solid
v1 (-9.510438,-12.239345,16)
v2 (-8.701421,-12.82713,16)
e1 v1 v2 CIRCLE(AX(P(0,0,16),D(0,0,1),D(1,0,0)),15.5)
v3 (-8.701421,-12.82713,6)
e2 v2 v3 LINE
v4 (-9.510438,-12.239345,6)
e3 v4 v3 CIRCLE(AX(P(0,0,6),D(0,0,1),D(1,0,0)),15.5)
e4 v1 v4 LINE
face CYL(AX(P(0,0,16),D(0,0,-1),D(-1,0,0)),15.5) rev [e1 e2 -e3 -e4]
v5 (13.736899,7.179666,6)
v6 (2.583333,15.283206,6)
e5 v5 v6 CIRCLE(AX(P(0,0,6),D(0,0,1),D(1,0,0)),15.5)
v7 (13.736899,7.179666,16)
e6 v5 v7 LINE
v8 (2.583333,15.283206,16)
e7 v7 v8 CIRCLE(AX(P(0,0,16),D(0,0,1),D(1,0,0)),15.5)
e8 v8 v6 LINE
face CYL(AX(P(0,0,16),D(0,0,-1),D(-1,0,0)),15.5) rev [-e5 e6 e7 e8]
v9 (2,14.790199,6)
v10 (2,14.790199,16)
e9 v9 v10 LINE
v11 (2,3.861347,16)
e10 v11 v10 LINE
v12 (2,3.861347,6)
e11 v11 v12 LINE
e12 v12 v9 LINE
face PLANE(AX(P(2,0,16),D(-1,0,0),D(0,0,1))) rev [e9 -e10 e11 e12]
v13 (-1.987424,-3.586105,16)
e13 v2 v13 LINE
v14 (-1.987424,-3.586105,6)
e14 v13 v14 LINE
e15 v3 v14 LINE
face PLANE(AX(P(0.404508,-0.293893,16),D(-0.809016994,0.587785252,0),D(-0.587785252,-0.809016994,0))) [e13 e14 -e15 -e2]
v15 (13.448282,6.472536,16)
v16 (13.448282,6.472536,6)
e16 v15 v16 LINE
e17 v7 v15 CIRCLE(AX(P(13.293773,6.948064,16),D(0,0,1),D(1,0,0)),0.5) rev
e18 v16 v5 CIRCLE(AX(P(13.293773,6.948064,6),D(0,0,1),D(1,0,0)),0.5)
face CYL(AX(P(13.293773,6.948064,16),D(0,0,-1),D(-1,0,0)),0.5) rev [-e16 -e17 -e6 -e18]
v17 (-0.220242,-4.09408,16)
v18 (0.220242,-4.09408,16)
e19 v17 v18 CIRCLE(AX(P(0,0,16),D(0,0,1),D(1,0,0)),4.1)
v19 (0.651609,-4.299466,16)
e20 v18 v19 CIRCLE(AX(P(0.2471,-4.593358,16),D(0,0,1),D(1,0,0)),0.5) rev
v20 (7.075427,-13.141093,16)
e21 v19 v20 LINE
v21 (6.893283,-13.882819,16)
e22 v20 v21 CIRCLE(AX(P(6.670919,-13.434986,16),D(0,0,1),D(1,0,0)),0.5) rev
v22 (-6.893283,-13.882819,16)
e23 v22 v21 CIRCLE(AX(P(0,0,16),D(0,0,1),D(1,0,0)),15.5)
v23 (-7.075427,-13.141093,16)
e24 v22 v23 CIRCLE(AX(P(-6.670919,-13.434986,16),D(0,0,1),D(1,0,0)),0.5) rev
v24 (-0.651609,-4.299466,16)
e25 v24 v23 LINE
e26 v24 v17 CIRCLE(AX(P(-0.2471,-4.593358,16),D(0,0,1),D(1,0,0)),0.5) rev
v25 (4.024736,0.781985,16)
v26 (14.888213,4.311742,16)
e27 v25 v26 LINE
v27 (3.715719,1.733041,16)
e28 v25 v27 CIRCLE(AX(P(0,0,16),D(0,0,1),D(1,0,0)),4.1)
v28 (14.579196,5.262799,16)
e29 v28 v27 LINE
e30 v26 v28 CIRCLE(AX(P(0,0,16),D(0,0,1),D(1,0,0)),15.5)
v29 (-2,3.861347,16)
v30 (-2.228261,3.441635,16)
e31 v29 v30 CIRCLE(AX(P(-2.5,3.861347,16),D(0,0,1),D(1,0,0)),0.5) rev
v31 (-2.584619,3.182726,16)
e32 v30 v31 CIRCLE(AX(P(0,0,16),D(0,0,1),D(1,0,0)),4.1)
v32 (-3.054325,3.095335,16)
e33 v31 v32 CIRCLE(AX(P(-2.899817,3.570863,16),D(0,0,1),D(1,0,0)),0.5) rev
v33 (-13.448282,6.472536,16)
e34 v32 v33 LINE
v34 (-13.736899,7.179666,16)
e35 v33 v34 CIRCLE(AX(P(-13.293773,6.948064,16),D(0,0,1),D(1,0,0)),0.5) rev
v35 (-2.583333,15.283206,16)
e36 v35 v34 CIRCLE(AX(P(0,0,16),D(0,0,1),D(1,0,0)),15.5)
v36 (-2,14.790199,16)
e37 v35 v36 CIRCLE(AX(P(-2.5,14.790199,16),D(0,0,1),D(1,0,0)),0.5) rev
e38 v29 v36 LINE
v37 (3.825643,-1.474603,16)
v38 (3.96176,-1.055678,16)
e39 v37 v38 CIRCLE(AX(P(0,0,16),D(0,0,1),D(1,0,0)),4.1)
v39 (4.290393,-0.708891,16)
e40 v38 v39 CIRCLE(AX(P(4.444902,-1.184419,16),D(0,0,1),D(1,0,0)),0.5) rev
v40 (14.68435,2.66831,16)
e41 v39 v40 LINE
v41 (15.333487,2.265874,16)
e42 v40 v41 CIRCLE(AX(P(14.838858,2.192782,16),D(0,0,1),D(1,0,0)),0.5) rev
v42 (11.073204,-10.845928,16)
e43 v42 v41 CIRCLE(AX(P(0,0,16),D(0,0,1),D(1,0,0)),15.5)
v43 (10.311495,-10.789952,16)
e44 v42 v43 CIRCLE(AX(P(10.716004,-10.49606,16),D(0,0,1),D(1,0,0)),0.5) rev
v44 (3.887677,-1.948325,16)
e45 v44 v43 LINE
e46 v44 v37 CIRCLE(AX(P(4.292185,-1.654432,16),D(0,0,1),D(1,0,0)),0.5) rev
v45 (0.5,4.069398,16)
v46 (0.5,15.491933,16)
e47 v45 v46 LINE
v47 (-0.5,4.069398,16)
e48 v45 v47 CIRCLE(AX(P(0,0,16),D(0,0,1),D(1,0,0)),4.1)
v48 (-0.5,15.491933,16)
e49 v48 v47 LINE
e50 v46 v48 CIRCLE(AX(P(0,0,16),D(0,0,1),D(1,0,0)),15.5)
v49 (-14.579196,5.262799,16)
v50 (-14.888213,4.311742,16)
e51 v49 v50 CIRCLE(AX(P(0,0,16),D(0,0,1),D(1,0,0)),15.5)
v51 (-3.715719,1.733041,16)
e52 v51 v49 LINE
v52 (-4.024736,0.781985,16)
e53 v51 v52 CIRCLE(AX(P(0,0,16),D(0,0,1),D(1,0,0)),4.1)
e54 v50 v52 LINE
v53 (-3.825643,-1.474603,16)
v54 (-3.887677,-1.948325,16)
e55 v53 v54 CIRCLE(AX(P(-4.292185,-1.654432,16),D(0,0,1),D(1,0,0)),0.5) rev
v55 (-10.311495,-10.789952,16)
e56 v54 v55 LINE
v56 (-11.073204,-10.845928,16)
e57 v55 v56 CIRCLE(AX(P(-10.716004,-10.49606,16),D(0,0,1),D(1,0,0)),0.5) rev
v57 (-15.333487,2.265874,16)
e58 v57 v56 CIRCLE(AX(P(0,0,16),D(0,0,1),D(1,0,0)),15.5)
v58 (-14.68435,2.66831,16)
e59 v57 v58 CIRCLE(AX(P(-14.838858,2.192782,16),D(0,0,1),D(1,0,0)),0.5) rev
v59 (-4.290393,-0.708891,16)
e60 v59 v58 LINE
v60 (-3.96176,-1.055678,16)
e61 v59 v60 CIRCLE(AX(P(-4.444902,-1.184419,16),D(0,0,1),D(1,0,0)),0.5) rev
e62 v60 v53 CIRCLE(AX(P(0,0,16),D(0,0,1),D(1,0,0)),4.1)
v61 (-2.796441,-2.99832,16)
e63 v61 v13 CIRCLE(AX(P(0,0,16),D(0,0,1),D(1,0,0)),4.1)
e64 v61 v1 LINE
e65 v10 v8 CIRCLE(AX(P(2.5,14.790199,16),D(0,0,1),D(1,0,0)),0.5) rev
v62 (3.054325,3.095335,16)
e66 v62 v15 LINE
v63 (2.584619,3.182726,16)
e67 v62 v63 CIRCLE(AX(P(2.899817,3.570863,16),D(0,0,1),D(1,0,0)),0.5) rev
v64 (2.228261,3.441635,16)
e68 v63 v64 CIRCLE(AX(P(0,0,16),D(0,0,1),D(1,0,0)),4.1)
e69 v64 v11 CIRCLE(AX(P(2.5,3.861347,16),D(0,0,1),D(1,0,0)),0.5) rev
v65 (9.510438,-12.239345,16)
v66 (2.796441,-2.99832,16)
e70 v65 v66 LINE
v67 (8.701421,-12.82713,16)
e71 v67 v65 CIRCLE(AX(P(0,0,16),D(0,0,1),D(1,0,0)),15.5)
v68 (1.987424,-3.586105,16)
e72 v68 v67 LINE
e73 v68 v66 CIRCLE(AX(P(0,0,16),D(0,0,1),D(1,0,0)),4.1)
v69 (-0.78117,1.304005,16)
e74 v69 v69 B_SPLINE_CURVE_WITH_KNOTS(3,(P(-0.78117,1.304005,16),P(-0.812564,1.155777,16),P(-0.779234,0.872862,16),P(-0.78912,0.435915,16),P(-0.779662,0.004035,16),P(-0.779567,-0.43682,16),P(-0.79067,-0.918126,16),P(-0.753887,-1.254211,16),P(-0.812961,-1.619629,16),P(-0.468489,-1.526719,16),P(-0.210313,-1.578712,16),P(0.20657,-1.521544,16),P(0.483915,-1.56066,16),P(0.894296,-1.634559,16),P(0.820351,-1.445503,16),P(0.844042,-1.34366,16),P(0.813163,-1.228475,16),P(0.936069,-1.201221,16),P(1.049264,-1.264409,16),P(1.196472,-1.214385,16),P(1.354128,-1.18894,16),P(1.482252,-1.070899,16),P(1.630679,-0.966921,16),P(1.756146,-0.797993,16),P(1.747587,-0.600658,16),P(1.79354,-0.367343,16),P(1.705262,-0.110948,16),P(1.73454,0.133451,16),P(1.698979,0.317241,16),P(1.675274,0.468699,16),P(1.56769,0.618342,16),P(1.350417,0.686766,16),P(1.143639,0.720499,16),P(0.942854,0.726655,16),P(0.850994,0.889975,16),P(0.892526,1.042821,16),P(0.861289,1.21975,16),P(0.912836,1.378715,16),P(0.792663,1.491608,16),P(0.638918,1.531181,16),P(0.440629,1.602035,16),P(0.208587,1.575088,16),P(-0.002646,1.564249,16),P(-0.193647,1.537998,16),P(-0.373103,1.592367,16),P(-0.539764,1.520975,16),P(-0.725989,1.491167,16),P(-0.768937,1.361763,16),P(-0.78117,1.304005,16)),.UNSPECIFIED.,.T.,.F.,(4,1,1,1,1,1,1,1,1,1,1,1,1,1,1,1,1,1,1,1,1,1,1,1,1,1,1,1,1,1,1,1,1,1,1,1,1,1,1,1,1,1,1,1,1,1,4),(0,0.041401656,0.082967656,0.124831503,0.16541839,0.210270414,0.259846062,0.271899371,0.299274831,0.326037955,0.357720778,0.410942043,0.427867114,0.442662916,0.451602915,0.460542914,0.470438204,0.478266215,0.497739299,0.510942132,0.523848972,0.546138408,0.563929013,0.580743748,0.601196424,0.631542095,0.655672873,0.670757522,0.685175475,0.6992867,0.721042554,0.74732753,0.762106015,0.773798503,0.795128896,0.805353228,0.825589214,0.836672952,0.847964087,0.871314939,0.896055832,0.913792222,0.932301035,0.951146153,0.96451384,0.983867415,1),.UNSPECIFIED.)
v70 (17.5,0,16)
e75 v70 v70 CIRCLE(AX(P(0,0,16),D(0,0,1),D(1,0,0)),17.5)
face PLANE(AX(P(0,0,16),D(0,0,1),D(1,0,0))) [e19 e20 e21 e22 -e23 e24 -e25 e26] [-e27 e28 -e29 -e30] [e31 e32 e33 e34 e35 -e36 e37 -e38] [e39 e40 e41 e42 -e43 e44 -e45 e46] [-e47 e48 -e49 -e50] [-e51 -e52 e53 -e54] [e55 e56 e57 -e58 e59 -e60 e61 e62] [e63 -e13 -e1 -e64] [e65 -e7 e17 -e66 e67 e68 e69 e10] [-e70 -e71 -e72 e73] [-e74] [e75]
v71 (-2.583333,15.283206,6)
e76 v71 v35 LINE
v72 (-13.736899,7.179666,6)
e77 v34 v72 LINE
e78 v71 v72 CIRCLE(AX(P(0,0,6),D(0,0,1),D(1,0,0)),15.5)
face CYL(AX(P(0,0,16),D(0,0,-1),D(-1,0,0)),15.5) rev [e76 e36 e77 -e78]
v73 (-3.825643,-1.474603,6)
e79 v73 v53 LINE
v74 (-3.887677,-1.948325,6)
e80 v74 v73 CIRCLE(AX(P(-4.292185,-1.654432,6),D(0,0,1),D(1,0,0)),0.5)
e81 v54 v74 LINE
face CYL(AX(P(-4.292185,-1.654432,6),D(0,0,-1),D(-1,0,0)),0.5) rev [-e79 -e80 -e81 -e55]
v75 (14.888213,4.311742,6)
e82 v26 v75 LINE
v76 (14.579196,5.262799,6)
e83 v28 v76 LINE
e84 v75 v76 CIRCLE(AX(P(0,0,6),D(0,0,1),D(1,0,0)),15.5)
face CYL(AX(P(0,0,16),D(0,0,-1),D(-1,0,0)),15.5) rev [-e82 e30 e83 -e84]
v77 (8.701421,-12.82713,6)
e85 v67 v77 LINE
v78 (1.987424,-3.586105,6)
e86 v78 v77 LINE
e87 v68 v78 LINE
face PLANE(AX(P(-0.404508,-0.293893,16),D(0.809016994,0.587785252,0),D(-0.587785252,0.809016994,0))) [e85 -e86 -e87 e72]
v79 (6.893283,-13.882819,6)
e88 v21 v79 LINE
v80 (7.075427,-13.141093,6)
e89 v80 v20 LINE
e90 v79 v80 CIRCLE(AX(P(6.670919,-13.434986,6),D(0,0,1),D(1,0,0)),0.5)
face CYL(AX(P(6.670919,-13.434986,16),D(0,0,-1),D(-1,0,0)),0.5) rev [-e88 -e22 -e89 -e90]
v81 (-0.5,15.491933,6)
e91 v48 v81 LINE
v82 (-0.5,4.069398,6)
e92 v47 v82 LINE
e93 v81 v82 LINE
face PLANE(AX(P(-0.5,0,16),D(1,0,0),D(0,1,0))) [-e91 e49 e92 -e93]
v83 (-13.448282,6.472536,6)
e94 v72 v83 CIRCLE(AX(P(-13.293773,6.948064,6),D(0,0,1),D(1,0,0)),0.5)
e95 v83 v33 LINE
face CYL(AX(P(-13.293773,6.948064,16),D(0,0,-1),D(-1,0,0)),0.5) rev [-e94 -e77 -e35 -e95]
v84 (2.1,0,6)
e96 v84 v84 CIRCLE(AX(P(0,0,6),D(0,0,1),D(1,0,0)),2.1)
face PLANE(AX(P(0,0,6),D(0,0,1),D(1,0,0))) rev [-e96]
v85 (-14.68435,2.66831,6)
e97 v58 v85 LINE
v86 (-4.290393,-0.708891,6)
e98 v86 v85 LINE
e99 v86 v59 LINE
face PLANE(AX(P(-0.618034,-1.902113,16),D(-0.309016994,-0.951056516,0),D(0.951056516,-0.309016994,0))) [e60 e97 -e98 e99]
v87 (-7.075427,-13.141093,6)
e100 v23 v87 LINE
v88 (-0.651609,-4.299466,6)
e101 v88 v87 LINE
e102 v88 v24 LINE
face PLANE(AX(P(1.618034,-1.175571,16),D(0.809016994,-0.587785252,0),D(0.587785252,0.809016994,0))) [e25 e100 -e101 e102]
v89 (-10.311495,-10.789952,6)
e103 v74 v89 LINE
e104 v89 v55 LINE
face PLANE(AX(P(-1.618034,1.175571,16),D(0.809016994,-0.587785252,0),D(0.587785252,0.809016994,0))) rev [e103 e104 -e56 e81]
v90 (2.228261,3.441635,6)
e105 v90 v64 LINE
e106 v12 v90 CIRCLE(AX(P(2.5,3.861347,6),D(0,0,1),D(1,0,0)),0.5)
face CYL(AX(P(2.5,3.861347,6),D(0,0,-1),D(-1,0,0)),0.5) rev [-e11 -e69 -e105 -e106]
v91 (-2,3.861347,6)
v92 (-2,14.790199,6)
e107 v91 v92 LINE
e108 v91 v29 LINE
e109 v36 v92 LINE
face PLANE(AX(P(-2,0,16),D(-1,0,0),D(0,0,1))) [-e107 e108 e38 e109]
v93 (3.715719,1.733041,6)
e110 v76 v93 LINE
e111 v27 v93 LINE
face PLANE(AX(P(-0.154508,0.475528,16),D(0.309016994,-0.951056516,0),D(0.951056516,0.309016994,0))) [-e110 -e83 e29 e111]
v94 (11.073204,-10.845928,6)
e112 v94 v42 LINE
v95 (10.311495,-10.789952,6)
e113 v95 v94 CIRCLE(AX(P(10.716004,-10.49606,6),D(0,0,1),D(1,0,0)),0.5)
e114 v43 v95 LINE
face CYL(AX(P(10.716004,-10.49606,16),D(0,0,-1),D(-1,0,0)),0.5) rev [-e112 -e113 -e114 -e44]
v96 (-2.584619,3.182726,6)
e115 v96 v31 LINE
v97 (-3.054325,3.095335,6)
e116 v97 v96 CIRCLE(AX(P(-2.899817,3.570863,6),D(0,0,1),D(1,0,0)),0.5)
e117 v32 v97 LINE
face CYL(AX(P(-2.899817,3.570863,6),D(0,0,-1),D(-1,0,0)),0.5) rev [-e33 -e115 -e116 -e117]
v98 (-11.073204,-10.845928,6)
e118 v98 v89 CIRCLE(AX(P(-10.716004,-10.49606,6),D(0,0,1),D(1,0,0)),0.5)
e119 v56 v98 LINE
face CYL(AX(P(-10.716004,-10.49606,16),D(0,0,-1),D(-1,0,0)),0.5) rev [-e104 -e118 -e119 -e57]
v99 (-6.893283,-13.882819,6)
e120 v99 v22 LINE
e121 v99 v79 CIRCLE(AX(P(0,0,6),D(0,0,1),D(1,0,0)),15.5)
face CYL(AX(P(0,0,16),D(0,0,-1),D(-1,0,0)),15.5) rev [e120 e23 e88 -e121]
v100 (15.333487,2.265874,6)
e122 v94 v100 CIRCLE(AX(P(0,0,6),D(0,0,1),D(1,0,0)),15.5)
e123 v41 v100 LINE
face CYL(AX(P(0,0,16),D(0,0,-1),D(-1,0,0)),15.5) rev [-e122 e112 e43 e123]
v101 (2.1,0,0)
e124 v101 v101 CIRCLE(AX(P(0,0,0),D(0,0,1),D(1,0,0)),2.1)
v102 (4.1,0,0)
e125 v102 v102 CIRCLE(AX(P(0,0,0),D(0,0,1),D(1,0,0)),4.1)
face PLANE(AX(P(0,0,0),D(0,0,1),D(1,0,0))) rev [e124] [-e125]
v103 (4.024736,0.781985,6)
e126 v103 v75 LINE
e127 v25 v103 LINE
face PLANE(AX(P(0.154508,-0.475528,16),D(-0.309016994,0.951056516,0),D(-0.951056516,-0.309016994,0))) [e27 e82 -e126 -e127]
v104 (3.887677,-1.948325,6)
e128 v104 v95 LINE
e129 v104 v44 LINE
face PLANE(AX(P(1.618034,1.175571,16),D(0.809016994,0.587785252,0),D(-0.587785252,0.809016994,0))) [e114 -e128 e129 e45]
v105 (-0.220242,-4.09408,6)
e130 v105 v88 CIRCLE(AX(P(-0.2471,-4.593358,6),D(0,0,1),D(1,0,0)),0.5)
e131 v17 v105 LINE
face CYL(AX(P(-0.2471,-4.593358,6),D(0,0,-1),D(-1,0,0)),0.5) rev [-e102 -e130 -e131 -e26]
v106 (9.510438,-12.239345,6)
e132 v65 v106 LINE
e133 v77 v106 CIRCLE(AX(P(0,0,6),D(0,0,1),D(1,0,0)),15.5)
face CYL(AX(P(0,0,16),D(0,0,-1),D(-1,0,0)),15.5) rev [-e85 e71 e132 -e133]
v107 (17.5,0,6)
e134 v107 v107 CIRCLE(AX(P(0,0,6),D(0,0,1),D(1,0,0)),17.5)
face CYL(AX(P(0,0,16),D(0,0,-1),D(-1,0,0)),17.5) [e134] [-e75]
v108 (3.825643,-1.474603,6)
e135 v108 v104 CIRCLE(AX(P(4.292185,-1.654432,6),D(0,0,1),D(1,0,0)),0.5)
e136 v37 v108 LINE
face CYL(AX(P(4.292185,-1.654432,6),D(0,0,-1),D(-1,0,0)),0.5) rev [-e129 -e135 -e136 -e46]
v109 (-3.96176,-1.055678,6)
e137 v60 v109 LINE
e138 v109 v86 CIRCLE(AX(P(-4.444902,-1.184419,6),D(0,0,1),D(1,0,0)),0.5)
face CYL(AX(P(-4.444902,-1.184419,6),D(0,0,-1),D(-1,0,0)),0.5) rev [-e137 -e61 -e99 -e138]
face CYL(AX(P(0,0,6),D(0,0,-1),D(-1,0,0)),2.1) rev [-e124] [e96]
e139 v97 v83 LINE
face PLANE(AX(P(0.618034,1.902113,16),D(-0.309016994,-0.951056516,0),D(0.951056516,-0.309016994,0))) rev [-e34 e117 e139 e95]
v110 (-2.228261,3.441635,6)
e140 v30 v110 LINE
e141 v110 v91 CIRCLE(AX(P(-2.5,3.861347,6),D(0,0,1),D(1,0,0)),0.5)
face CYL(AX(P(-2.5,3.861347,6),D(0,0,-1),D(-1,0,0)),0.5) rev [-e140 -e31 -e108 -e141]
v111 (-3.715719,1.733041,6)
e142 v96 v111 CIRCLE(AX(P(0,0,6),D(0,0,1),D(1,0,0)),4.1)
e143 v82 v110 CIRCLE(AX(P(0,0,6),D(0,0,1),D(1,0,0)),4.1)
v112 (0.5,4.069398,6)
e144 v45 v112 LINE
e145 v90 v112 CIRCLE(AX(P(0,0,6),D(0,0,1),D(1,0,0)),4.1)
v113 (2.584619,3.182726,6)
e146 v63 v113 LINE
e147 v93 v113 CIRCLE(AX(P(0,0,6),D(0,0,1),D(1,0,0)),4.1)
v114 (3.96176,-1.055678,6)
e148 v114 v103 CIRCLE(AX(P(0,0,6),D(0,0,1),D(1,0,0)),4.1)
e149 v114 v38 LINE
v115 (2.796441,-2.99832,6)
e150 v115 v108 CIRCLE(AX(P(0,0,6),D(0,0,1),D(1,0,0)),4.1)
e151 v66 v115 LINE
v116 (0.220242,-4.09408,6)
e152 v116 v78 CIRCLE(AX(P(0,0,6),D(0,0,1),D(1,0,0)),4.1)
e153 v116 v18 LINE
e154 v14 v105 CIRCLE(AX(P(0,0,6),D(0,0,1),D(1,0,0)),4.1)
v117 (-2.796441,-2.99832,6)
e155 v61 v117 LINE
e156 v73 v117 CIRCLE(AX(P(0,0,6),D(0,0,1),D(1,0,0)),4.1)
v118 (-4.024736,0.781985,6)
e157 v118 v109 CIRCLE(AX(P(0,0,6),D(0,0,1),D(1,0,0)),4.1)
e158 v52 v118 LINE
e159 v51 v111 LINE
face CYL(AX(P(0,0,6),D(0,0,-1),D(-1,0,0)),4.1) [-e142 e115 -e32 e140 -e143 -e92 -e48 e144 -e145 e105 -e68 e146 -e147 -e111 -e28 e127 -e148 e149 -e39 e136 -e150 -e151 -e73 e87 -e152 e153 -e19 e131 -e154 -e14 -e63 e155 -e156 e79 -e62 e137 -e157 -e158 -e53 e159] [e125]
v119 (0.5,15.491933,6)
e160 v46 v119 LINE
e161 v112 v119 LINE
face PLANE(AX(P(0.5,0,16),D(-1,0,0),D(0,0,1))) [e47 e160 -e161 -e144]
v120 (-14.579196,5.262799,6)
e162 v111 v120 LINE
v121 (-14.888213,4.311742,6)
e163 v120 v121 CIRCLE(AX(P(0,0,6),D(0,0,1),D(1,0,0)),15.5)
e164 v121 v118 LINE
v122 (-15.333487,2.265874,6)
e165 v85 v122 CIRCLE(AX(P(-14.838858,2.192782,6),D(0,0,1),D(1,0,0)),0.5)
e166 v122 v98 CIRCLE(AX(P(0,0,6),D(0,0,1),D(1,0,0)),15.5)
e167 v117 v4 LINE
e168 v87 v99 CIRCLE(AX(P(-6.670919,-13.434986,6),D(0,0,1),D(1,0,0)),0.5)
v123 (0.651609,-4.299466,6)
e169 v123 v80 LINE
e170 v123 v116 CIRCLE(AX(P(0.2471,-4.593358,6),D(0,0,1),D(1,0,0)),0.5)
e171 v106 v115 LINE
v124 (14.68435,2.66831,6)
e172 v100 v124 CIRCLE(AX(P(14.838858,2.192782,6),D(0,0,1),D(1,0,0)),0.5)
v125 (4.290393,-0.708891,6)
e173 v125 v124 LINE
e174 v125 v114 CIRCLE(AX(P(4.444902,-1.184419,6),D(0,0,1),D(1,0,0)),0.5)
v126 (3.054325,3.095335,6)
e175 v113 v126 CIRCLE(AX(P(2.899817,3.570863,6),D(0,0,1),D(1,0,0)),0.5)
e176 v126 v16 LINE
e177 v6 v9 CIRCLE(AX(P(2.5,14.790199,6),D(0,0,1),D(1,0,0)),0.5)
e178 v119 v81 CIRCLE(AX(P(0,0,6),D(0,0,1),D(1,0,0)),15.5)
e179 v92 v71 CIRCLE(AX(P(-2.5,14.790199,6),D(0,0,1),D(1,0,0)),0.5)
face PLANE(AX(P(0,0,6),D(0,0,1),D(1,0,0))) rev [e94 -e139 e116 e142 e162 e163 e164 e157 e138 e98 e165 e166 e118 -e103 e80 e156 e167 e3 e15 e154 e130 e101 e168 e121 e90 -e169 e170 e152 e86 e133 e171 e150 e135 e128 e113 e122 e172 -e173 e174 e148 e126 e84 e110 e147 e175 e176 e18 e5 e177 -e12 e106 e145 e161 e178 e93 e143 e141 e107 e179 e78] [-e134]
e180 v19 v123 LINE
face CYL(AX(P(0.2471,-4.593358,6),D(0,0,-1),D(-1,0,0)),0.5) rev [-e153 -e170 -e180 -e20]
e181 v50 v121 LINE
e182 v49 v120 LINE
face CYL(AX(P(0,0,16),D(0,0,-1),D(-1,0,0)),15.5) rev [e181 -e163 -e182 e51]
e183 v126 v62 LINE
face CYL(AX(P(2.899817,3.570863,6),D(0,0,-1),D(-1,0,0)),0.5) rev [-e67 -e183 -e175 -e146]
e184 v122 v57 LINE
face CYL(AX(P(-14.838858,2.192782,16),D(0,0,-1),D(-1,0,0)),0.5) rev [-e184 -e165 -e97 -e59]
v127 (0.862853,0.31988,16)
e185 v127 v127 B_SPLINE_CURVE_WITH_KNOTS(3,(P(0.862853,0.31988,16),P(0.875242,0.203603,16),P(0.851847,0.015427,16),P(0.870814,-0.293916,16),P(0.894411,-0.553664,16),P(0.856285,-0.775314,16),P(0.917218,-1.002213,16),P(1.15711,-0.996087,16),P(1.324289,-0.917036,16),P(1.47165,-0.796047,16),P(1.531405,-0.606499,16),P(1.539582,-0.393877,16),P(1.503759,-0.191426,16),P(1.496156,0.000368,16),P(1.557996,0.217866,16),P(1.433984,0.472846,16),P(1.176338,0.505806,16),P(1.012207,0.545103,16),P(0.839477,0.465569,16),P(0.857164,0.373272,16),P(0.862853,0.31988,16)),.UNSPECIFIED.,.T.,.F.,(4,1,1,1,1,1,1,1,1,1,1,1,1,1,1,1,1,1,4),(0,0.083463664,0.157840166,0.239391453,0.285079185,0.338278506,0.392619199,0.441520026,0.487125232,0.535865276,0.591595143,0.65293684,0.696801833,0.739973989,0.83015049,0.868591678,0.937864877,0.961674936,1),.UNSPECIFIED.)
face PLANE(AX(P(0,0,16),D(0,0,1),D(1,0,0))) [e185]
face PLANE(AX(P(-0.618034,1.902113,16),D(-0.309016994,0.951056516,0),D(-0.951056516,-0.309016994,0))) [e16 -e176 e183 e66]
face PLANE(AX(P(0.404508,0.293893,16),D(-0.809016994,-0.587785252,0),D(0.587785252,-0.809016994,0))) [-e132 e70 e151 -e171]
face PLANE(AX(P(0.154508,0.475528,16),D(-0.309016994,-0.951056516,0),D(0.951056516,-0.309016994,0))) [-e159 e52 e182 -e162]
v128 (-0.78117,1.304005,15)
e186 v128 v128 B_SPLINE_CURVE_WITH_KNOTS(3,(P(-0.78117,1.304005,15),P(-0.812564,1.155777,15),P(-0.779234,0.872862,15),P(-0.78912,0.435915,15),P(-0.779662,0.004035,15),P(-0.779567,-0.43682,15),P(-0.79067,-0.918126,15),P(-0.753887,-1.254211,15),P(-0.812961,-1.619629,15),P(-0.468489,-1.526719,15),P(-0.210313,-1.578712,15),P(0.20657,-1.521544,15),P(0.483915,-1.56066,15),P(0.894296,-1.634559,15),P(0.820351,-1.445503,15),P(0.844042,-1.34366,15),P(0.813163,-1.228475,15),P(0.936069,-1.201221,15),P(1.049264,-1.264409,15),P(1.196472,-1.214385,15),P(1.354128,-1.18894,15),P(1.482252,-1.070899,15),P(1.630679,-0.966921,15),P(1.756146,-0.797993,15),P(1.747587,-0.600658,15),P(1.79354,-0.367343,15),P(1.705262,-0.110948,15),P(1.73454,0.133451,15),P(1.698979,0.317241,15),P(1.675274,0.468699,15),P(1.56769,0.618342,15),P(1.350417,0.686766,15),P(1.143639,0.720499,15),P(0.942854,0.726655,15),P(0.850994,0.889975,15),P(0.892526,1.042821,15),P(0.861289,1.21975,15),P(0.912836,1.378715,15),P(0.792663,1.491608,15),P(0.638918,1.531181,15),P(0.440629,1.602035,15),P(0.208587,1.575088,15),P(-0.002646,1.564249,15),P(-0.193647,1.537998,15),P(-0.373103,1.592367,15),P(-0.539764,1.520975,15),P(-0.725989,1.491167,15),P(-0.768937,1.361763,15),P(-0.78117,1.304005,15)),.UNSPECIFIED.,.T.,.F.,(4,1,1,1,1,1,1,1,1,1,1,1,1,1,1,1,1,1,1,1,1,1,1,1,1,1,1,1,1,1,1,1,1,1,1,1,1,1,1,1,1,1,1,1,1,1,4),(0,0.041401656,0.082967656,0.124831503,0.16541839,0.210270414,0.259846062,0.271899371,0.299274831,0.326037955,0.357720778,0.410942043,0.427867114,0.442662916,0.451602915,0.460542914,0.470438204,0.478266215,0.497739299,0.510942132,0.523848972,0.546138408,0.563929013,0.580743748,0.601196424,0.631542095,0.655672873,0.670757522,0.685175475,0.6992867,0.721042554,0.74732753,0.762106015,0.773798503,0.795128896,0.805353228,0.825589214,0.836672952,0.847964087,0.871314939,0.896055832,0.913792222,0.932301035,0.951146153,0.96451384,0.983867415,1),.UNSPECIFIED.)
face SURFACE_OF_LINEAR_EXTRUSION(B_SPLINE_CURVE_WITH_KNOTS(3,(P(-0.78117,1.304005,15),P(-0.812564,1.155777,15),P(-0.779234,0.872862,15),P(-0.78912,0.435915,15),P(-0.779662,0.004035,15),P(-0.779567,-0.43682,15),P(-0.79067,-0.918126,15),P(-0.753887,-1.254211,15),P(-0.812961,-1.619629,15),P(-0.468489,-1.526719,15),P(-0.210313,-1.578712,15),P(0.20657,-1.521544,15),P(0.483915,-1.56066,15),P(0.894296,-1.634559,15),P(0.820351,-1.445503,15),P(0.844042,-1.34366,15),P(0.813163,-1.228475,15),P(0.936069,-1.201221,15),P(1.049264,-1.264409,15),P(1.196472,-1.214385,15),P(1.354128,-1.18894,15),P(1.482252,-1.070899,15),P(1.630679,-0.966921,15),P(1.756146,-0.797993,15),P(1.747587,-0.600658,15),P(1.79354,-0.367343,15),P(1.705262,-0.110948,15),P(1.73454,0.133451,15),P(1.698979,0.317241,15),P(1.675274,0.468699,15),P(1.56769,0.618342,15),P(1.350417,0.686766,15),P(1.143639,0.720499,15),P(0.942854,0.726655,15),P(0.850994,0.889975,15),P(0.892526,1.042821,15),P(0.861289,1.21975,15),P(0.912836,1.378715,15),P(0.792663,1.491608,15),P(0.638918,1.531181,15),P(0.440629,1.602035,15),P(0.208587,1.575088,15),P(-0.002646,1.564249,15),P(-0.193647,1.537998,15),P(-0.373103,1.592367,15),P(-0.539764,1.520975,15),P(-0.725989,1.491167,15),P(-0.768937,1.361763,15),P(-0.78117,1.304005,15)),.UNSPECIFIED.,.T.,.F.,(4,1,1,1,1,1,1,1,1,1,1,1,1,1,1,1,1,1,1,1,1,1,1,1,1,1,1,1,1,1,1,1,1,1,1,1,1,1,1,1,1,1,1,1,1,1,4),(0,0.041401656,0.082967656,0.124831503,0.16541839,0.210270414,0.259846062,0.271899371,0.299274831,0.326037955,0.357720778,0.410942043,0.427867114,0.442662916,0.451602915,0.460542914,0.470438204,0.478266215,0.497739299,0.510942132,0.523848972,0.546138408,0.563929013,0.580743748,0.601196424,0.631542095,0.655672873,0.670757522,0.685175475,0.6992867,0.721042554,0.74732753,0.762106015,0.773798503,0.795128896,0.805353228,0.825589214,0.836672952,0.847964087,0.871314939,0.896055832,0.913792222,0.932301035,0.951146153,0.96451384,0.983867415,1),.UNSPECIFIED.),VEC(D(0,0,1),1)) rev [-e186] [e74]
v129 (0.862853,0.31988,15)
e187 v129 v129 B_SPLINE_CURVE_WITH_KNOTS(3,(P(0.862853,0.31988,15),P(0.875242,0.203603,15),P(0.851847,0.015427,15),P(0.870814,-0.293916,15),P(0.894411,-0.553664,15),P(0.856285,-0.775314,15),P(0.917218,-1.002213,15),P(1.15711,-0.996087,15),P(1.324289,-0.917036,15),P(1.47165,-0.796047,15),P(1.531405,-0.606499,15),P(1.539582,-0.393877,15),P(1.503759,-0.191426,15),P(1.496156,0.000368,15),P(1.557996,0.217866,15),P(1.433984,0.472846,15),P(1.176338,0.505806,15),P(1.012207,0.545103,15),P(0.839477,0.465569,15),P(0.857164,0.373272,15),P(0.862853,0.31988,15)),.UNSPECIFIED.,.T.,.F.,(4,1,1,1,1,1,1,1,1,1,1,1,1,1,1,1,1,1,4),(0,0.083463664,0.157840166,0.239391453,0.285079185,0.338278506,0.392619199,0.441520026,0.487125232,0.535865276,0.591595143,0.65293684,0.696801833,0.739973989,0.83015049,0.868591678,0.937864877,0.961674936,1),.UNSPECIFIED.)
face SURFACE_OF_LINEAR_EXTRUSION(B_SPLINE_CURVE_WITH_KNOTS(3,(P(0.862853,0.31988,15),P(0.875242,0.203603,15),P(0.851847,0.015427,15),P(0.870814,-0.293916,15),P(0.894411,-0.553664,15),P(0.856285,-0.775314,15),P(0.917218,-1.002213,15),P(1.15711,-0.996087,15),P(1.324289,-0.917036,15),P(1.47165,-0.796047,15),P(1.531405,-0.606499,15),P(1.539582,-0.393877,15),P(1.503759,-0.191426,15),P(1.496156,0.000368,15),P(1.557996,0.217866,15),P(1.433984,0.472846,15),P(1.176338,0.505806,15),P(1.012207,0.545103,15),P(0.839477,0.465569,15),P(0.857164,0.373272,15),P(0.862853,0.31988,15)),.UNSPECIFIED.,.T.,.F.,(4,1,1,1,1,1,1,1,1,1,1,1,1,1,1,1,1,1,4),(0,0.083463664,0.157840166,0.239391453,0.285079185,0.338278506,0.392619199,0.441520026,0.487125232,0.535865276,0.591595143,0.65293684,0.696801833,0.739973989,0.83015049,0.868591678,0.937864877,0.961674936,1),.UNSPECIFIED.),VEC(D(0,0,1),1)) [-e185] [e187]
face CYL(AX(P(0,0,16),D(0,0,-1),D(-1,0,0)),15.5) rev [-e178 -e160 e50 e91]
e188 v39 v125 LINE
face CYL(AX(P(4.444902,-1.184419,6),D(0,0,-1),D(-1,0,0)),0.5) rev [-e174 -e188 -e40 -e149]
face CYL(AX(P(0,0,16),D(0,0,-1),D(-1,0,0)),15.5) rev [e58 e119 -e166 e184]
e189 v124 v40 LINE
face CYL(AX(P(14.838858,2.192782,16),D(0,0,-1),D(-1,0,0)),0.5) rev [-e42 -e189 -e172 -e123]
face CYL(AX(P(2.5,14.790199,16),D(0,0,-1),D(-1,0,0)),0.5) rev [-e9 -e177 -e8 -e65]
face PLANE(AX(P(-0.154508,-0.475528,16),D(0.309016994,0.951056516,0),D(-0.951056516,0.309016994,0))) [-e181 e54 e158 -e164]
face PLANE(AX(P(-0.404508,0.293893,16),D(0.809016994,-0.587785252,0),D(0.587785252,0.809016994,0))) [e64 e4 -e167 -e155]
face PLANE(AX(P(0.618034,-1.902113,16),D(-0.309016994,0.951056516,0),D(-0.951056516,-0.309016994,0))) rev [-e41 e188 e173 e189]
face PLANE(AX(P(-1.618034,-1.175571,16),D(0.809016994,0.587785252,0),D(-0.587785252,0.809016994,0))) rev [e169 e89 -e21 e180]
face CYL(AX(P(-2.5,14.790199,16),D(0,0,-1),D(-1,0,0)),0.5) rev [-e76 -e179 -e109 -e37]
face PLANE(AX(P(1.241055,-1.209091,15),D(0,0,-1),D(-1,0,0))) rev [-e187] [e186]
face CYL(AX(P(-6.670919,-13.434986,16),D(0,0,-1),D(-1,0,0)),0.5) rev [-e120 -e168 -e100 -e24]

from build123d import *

# Parameters (mm, degrees)
ESQUISSE1_R                  = 4.1
ESQUISSE1_R_2                = 2.1
BOSS_EXTRU_1_DEPTH           = 6
ESQUISSE2_R                  = 17.5
BOSS_EXTRU_3_DEPTH           = 10
CONG_5_R                     = 0.5
R_P_TITION_CIRCULAIRE2_COUNT = 5
CONG_6_R                     = 0.5
ENL_V_MAT_EXTRU_1_DEPTH      = 1


with BuildPart() as part:
    # Esquisse1 → Boss.-Extru.1 (new body)
    with BuildSketch(Plane.XY):
        Circle(ESQUISSE1_R)
        Circle(ESQUISSE1_R_2, mode=Mode.SUBTRACT)
    extrude(amount=BOSS_EXTRU_1_DEPTH)

    # Esquisse2 → Boss.-Extru.3 (add)
    with BuildSketch(Plane.XY.offset(6)):
        Circle(ESQUISSE2_R)
        with BuildLine():
            Line((2, 3.579106034), (2, 15.370426149))
            ThreePointArc((2, 15.370426149), (0, -15.5), (-2, 15.370426149))
            Line((-2, 15.370426149), (-2, 3.579106034))
            ThreePointArc((-2, 3.579106034), (0, -4.1), (2, 3.579106034))
        make_face(mode=Mode.SUBTRACT)
        with BuildLine():
            Line((-0.5, 4.06939799), (-0.5, 15.491933385))
            ThreePointArc((-0.5, 15.491933385), (0, 15.5), (0.5, 15.491933385))
            Line((0.5, 15.491933385), (0.5, 4.06939799))
            ThreePointArc((0.5, 4.06939799), (0, 4.1), (-0.5, 4.06939799))
        make_face(mode=Mode.SUBTRACT)
    boss_extru_3 = extrude(amount=BOSS_EXTRU_3_DEPTH)

    # Congé5
    # the kernel refuses this fillet: 0.5 mm, written as the material it adds along each edge
    with BuildSketch(Plane(origin=(2, 3.579106034, 6), x_dir=(0.856640365534706, -0.5159140278540265, 0), z_dir=(0, 0, 1))) as cong_5_piece_1:
        with BuildLine():
            CenterArc((0.282708153, 0.499735946), CONG_5_R, 211.058569469, 57.079265472)
            Line((-0.14561203, 0.241778932), (0, 0))
            ThreePointArc((0, 0), (0.133230279, 0.002165243), (0.266460558, 0))
        make_face()
    extrude(amount=10)
    with BuildSketch(Plane(origin=(2, 15.370426149, 6), x_dir=(0, -1, 0), z_dir=(0, 0, 1))) as cong_5_piece_2:
        with BuildLine():
            CenterArc((0.580226691, 0.5), CONG_5_R, 170.405931773, 99.594068227)
            ThreePointArc((0.087220043, 0.583333333), (0.040835089, 0.292081575), (0, 0))
            Line((0, 0), (0.580226691, 0))
        make_face()
    extrude(amount=10)
    with BuildSketch(Plane(origin=(-2, 15.370426149, 6), x_dir=(0, -1, 0), z_dir=(0, 0, 1))) as cong_5_piece_3:
        with BuildLine():
            CenterArc((0.580226691, -0.5), CONG_5_R, 90, 99.594068227)
            ThreePointArc((0.087220043, -0.583333333), (0.040835089, -0.292081575), (0, 0))
            Line((0, 0), (0.580226691, 0))
        make_face()
    extrude(amount=10)
    with BuildSketch(Plane(origin=(-2, 3.579106034, 6), x_dir=(-0.8566403655347238, -0.515914027853997, 0), z_dir=(0, 0, 1))) as cong_5_piece_4:
        with BuildLine():
            CenterArc((0.282708153, -0.499735946), CONG_5_R, 91.862165059, 57.079265472)
            Line((-0.14561203, -0.241778932), (0, 0))
            ThreePointArc((0, 0), (0.133230279, -0.002165243), (0.266460558, 0))
        make_face()
    extrude(amount=10)

    # Répétition circulaire2: Boss.-Extru.3 ×5 about axis
    r_p_tition_circulaire2_axis = Axis((0, 0, 0), (0, 0, 1))
    for i in range(1, R_P_TITION_CIRCULAIRE2_COUNT):
        add(boss_extru_3.rotate(r_p_tition_circulaire2_axis, i * 360 / R_P_TITION_CIRCULAIRE2_COUNT))

    # Congé6
    # the kernel refuses this fillet: 0.5 mm, written as the material it adds along each edge
    with BuildSketch(Plane(origin=(-14.000109958, 6.651835923, 6), x_dir=(0.95105651629517, -0.3090169943748974, 0), z_dir=(0, 0, 1)), Plane(origin=(-10.652543801, -11.259365461, 6), x_dir=(0.5877852522924284, 0.8090169943749799, 0), z_dir=(0, 0, 1)), Plane(origin=(7.416475823, -13.61050647, 6), x_dir=(-0.5877852522925181, 0.8090169943749146, 0), z_dir=(0, 0, 1)), Plane(origin=(15.236177936, 2.847609858, 6), x_dir=(-0.9510565162951373, -0.30901699437499736, 0), z_dir=(0, 0, 1))) as cong_6_piece_1:
        with BuildLine():
            CenterArc((0.580226691, 0.5), CONG_6_R, 170.405931773, 99.594068227)
            ThreePointArc((0.087220043, 0.583333333), (0.040835089, 0.292081575), (0, 0))
            Line((0, 0), (0.580226691, 0))
        make_face()
    extrude(amount=10)
    with BuildSketch(Plane(origin=(-4.021966105, -0.796108444, 6), x_dir=(-0.9510565162951476, 0.30901699437496566, 0), z_dir=(0, 0, 1)), Plane(origin=(-0.485711754, -4.07112811, 6), x_dir=(-0.587785252292492, -0.8090169943749336, 0), z_dir=(0, 0, 1)), Plane(origin=(2.785898127, 3.008117622, 6), x_dir=(0.95105651629516, 0.30901699437492763, 0), z_dir=(0, 0, 1)), Plane(origin=(3.721779732, -1.719987101, 6), x_dir=(0.5877852522924618, -0.8090169943749556, 0), z_dir=(0, 0, 1))) as cong_6_piece_2:
        with BuildLine():
            CenterArc((0.282240882, 0.5), CONG_6_R, 212.920734528, 57.079265472)
            ThreePointArc((-0.13747074, 0.22826087), (-0.066880535, 0.115247514), (0, 0))
            Line((0, 0), (0.282240882, 0))
        make_face()
    extrude(amount=10)
    with BuildSketch(Plane(origin=(-2.785898127, 3.008117622, 6), x_dir=(-0.9510565162951584, 0.30901699437493263, 0), z_dir=(0, 0, 1)), Plane(origin=(0.485711754, -4.07112811, 6), x_dir=(0.5877852522924834, -0.80901699437494, 0), z_dir=(0, 0, 1)), Plane(origin=(4.021966105, -0.796108444, 6), x_dir=(0.9510565162951494, 0.3090169943749601, 0), z_dir=(0, 0, 1)), Plane(origin=(-3.721779732, -1.719987101, 6), x_dir=(-0.5877852522924625, -0.8090169943749551, 0), z_dir=(0, 0, 1))) as cong_6_piece_3:
        with BuildLine():
            CenterArc((0.282240882, -0.5), CONG_6_R, 90, 57.079265472)
            ThreePointArc((-0.13747074, -0.22826087), (-0.066880535, -0.115247514), (0, 0))
            Line((0, 0), (0.282240882, 0))
        make_face()
    extrude(amount=10)
    with BuildSketch(Plane(origin=(-15.236177936, 2.847609858, 6), x_dir=(0.9510565162950345, -0.3090169943753136, 0), z_dir=(0, 0, 1)), Plane(origin=(10.652543801, -11.259365461, 6), x_dir=(-0.5877852522921582, 0.8090169943751762, 0), z_dir=(0, 0, 1)), Plane(origin=(14.000109958, 6.651835923, 6), x_dir=(-0.9510565162952725, -0.30901699437458163, 0), z_dir=(0, 0, 1)), Plane(origin=(-7.416475823, -13.61050647, 6), x_dir=(0.5877852522927831, 0.8090169943747222, 0), z_dir=(0, 0, 1))) as cong_6_piece_4:
        with BuildLine():
            CenterArc((0.580226691, -0.5), CONG_6_R, 90, 99.594068227)
            ThreePointArc((0.087220043, -0.583333333), (0.040835089, -0.292081575), (0, 0))
            Line((0, 0), (0.580226691, 0))
        make_face()
    extrude(amount=10)

    # Esquisse3 → Enlèv. mat.-Extru.1 (cut)
    with BuildSketch(Plane.XY.offset(16)):
        with BuildLine():
            add(Edge.make_bspline(
                [(-0.781170014, 1.304004922), (-0.812563749, 1.155777067), (-0.779234347, 0.872861941), (-0.789120429, 0.435915264), (-0.779662215, 0.00403459), (-0.779566847, -0.436819947), (-0.790669805, -0.918125792), (-0.753886654, -1.254210502), (-0.812960802, -1.619629404), (-0.46848935, -1.526718543), (-0.210313129, -1.578712073), (0.206570231, -1.5215438), (0.483914566, -1.560659915), (0.894295895, -1.634559216), (0.820350644, -1.445502947), (0.844042185, -1.343660096), (0.813162572, -1.228475349), (0.936068838, -1.201220794), (1.049263647, -1.264408958), (1.196472414, -1.2143847), (1.354127977, -1.188939762), (1.48225229, -1.070899097), (1.630678619, -0.966920839), (1.756146104, -0.797993424), (1.747587013, -0.600658443), (1.793539651, -0.36734293), (1.705261694, -0.110947754), (1.73453965, 0.133450986), (1.698978601, 0.317241234), (1.675274487, 0.468699178), (1.567690497, 0.618342491), (1.350417168, 0.686766032), (1.143639018, 0.720499311), (0.9428535, 0.726655294), (0.85099379, 0.889975418), (0.8925264, 1.042820703), (0.861289404, 1.219750047), (0.912836482, 1.378714894), (0.792663409, 1.491607795), (0.638917577, 1.531180573), (0.440629112, 1.60203452), (0.20858732, 1.575087697), (-0.002645656, 1.564249374), (-0.193646565, 1.537998466), (-0.373102838, 1.592366964), (-0.539764419, 1.520975183), (-0.725989147, 1.491167171), (-0.768937119, 1.361763444), (-0.781170014, 1.304004922)],
                knots=[0, 0, 0, 0, 0.041401656, 0.082967656, 0.124831503, 0.16541839, 0.210270414, 0.259846062, 0.271899371, 0.299274831, 0.326037955, 0.357720778, 0.410942043, 0.427867114, 0.442662916, 0.451602915, 0.460542914, 0.470438204, 0.478266215, 0.497739299, 0.510942132, 0.523848972, 0.546138408, 0.563929013, 0.580743748, 0.601196424, 0.631542095, 0.655672873, 0.670757522, 0.685175475, 0.6992867, 0.721042554, 0.74732753, 0.762106015, 0.773798503, 0.795128896, 0.805353228, 0.825589214, 0.836672952, 0.847964087, 0.871314939, 0.896055832, 0.913792222, 0.932301035, 0.951146153, 0.96451384, 0.983867415, 1, 1, 1, 1], degree=3))
        make_face()
        with BuildLine():
            add(Edge.make_bspline(
                [(0.862853166, 0.319880005), (0.875242371, 0.203602803), (0.851846633, 0.015426685), (0.870814127, -0.293915634), (0.894410845, -0.55366391), (0.8562846, -0.775313723), (0.917218147, -1.002213112), (1.157109792, -0.996086818), (1.324288904, -0.917035516), (1.471649561, -0.796046729), (1.531405346, -0.606499314), (1.539582323, -0.393876838), (1.503758708, -0.19142601), (1.496156029, 0.000367913), (1.557995818, 0.217865985), (1.433984078, 0.472846391), (1.176337864, 0.505805782), (1.012207317, 0.545102616), (0.839476839, 0.465569349), (0.857164259, 0.373272475), (0.862853166, 0.319880005)],
                knots=[0, 0, 0, 0, 0.083463664, 0.157840166, 0.239391453, 0.285079185, 0.338278506, 0.392619199, 0.441520026, 0.487125232, 0.535865276, 0.591595143, 0.65293684, 0.696801833, 0.739973989, 0.83015049, 0.868591678, 0.937864877, 0.961674936, 1, 1, 1, 1], degree=3))
        make_face(mode=Mode.SUBTRACT)
    extrude(amount=-ENL_V_MAT_EXTRU_1_DEPTH, mode=Mode.SUBTRACT)


solid = part.part
